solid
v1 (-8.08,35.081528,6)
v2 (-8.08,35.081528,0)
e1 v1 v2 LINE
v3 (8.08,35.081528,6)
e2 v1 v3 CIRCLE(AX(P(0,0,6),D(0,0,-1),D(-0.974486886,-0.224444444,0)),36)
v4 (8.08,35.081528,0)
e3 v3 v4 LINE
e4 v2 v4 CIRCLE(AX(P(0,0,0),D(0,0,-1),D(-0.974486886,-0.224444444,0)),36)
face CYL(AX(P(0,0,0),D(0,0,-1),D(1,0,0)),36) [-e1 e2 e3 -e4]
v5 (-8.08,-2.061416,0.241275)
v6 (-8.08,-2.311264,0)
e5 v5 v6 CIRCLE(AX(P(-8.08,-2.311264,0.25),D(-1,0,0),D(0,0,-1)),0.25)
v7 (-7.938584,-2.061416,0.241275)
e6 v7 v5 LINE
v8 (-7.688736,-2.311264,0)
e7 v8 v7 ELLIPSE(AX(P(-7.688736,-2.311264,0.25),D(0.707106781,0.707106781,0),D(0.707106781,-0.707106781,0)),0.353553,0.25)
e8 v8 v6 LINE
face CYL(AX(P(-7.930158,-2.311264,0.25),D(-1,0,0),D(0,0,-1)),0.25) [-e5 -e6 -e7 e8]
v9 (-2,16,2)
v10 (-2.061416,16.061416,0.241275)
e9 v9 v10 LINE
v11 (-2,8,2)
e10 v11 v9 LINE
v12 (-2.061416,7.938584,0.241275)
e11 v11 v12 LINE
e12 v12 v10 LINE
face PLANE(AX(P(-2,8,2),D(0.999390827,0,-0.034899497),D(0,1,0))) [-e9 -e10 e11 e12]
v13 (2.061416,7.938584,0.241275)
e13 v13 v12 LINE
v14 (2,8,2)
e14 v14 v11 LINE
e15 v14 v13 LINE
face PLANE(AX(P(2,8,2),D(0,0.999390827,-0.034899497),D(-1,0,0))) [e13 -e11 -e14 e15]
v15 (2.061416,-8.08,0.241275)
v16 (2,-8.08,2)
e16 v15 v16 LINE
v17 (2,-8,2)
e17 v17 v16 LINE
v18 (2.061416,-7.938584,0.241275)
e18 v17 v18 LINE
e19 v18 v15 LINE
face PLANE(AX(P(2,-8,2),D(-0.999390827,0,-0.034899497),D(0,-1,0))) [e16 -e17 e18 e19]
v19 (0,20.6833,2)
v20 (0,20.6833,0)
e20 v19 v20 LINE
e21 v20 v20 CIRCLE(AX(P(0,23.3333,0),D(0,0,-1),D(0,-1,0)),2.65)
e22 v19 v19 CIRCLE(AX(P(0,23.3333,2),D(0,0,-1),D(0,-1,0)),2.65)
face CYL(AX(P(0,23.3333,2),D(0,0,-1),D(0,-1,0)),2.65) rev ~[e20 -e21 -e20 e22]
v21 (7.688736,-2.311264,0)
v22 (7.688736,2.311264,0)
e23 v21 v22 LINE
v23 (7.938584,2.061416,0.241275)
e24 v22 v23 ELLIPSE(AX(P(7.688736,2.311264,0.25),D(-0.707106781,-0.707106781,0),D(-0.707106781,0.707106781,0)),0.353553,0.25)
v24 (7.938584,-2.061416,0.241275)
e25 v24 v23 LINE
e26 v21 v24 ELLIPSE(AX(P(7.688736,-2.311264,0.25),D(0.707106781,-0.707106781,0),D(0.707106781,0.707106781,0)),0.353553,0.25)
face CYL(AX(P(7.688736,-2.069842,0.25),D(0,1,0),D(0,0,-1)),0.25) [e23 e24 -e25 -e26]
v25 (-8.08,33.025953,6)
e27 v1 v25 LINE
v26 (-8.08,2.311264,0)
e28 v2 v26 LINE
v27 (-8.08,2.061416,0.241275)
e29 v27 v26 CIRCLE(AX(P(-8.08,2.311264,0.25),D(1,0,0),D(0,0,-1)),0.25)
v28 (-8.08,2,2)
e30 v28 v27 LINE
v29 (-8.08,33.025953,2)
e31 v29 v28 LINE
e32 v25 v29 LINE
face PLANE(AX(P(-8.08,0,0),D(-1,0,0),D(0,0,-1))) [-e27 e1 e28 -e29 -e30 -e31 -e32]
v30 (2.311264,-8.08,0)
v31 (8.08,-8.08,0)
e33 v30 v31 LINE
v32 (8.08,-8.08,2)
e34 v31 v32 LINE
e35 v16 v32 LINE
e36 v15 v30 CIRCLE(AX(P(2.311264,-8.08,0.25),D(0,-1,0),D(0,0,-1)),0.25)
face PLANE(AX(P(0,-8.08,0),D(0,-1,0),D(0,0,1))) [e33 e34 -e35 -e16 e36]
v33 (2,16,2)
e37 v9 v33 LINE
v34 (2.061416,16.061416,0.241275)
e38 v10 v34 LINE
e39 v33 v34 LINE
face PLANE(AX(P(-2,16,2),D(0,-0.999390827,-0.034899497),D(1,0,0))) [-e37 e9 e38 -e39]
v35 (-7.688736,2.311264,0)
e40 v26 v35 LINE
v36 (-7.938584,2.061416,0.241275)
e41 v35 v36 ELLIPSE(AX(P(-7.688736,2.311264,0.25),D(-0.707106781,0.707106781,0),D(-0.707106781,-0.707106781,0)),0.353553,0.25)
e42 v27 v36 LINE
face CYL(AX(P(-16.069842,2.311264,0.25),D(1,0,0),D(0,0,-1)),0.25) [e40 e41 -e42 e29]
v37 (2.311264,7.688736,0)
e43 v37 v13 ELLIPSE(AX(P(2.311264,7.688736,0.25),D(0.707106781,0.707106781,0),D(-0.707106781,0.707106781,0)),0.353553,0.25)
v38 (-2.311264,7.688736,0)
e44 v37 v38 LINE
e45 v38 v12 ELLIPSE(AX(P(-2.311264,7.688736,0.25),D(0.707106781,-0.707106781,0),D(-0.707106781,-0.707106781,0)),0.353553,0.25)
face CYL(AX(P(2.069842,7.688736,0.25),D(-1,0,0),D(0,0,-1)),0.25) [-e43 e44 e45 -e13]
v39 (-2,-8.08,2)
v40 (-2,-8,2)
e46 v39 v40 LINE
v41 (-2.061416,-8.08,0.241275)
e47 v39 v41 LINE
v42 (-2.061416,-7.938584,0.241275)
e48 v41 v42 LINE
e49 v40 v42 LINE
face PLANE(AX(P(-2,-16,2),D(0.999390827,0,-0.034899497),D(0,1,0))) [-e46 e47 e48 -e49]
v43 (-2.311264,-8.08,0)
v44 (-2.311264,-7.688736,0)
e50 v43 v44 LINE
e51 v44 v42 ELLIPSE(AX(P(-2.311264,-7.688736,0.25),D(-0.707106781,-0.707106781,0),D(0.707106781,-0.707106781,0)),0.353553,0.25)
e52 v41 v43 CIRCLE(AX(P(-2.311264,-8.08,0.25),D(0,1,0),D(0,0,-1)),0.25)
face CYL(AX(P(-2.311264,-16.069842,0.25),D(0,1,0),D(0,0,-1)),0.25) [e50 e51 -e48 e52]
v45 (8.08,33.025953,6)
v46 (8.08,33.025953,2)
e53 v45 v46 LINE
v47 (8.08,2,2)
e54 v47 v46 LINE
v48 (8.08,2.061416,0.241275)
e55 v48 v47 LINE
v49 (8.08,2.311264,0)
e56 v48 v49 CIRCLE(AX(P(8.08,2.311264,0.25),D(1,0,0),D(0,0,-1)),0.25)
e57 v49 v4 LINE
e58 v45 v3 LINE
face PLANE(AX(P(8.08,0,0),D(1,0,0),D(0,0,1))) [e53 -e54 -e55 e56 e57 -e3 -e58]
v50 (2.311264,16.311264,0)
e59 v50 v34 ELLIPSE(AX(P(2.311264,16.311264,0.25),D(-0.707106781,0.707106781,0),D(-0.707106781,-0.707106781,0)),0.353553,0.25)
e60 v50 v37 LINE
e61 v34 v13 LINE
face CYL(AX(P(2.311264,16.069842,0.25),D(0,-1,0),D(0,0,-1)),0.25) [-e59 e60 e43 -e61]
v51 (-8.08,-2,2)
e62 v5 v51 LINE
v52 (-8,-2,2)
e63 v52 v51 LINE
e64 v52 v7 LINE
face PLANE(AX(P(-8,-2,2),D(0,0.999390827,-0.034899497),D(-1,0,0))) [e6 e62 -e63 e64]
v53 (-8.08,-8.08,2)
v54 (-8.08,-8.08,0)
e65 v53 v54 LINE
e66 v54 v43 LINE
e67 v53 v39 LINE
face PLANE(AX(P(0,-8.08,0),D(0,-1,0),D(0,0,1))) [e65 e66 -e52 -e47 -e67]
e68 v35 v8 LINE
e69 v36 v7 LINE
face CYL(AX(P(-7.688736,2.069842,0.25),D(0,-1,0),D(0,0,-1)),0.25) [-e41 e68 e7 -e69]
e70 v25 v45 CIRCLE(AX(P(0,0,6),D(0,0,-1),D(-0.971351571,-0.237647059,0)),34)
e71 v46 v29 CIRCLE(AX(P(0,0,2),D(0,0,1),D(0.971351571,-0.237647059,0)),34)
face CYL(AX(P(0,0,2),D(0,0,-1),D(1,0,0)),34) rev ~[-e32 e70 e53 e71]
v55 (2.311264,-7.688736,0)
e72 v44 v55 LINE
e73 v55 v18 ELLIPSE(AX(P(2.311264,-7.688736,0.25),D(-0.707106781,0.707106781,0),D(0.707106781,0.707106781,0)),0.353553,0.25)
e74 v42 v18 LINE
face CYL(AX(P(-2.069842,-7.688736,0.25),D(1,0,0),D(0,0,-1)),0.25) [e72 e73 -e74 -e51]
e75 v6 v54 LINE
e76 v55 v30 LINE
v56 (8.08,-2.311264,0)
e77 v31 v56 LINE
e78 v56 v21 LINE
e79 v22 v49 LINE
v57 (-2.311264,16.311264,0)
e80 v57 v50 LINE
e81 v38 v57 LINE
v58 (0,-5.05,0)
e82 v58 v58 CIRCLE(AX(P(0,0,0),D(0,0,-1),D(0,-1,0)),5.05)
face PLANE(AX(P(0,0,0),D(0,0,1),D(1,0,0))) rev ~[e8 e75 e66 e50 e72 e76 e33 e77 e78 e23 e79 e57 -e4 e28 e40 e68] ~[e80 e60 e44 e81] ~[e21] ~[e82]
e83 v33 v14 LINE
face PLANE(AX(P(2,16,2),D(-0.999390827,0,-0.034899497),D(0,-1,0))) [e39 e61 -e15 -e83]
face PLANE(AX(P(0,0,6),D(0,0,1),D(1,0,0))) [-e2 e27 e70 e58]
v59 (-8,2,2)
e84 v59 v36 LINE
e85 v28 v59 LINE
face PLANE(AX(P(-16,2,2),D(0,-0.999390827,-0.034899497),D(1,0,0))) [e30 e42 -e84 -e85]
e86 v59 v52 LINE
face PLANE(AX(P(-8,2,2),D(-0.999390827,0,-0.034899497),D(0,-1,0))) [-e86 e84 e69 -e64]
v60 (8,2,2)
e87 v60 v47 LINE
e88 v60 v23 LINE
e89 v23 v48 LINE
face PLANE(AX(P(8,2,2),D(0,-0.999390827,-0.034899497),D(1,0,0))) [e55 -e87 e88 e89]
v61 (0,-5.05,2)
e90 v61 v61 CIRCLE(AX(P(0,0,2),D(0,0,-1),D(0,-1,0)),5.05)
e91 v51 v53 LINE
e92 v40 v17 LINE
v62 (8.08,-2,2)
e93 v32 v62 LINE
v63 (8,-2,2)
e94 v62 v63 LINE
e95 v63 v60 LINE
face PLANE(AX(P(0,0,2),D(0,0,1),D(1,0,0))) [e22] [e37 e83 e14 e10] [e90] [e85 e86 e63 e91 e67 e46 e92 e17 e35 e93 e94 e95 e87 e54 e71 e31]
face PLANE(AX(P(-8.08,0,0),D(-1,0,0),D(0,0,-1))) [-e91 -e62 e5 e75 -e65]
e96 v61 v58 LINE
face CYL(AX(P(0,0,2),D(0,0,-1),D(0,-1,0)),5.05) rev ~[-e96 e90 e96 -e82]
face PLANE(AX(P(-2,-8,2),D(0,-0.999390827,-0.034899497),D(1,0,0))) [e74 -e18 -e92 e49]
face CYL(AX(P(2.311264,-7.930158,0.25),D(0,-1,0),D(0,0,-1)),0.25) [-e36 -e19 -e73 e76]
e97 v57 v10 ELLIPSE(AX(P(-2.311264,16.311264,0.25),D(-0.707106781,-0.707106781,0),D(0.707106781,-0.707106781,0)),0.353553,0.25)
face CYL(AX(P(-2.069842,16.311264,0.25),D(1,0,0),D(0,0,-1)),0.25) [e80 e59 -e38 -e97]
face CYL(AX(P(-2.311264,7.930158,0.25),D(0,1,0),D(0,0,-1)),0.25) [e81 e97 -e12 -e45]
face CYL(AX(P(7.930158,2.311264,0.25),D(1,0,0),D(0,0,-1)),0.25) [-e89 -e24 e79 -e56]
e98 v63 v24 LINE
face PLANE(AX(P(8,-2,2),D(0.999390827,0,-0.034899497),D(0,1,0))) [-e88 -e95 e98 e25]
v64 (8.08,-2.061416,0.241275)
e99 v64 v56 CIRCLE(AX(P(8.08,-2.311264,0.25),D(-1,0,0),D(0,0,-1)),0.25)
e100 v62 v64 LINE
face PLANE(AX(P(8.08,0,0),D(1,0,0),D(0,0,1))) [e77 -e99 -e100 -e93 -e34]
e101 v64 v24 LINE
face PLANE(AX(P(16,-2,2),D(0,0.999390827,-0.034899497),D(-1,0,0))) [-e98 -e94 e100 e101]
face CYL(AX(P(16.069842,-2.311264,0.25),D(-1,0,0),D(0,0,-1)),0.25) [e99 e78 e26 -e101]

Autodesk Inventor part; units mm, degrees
sketch "Sketch1" plane through (0, 0, 0) normal (0, 0, 1) x (1, 0, 0)
  circle A0 centre (0, 0) radius 36
  dimension "d0" = 72
extrude "Extrusion1" add sketch "Sketch1" along normal blind 2
sketch "Sketch2" plane through (0, 0, 2) normal (0, 0, 1) x (1, 0, 0)
  circle A0 centre (0, 0) radius 36 projected
  circle A1 centre (0, 0) radius 34
  dimension "d3" = 2
extrude "Extrusion2" add sketch "Sketch2" along normal blind 4
sketch "Sketch4" plane through (0, 0, 2) normal (0, 0, 1) x (1, 0, 0)
  point P0 (0, 0)
  point P1 (0, 0)
hole "Hole1" at (0, 0, 2) direction (0, 0, -1) diameter 10.1 end through all
sketch "Sketch5" plane through (0, 0, 2) normal (0, 0, 1) x (1, 0, 0)
  point P0 (0, 0)
  point P1 (0, 23.3333)
  dimension "d13" = 23.3333
hole "Hole2" at (0, 23.3333, 2) direction (0, 0, -1) diameter 5.3 end through all
pattern_circular "Circular Pattern1" count 5 over 360 about axis through (0, 0, -100) along (0, 0, 1) of "Hole2"
sketch "Sketch8" plane through (0, 0, 2) normal (0, 0, 1) x (1, 0, 0)
  circle A0 centre (22.1913, 7.2104) radius 2.65 projected
  circle A1 centre (13.715, -18.8771) radius 2.65 projected
  circle A2 centre (-13.715, -18.8771) radius 2.65 projected
  circle A3 centre (-22.1913, 7.2104) radius 2.65 projected
  circle A4 centre (0, 23.3333) radius 2.65 projected
  circle A5 centre (0, 0) radius 5.05 projected
  circle A6 centre (0, 0) radius 34 projected
  line L0 (-2, 16) -> (2, 16)
  line L1 (2, 16) -> (2, 8)
  line L2 (2, 8) -> (-2, 8)
  line L3 (-2, 8) -> (-2, 16)
  dimension "d43" = 4
  dimension "d44" = 8
  dimension "d45" = 8
  dimension "d48" = 2
extrude "Extrusion5" cut sketch "Sketch8" against normal up to surface (2 mm away) draft 2 contours L0 L1 L2 L3
fillet "Fillet2" radius 0.25 4 edges at (0, 7.9302, 0) (2.0698, 12, 0) (0, 16.0698, 0) (-2.0698, 12, 0)
pattern_circular "Circular Pattern3" count 4 over 360 about axis through (0, 0, -100) along (0, 0, 1) of "Extrusion5", "Fillet2"
ref_plane "Work Plane1" through (8.08, 0, 0) normal (1, 0, 0) x (0, 1, 0)
ref_plane "Work Plane2" through (-8.08, 0, 0) normal (1, 0, 0) x (0, 1, 0)
ref_plane "Work Plane3" through (0, -8.08, 0) normal (0, 1, 0) x (-1, 0, 0)
split "Split1" plane through (0, -8.08, 0) removes the side toward (0, -1, 0)
split "Split2" plane through (8.08, 0, 0) removes the side toward (1, 0, 0)
split "Split3" plane through (-8.08, 0, 0) removes the side toward (-1, 0, 0)
equation "\"d0\" = W_innerDiameter + W_wallThickness"
equation "\"d1\" = W_wallThickness"
equation "\"d3\" = W_wallThickness"
equation "\"d4\" = W_innerDepth"
equation "\"d6\" = W_innerGearHoleDiameter"
equation "\"d13\" = OG_distanceFromCenter"
equation "\"d14\" = W_outerGearHoleDiameter"
equation "\"W_wallThickness\" = 2"
equation "\"W_innerDepth\" = 4"
equation "\"W_innerGearHoleDiameter\" = 10.1"
equation "\"W_outerGearHoleDiameter\" = 5.3"
equation "\"OG_distanceFromCenter\" = 23.33333"
equation "\"W_innerDiameter\" = 70"
equation "\"Wheel_Related_W_\" = 0"
equation "\"W_holesClearance\" = 0.3"
equation "\"TempSpotReserved7\" = 0"
equation "\"TempSpotReserved8\" = 0"
equation "\"TempSpotReserved9\" = 0"
equation "\"TempSpotReserved10\" = 0"
equation "\"TempSpotReserved11\" = 0"
equation "\"TempSpotReserved12\" = 0"
equation "\"TempSpotReserved13\" = 0"
equation "\"TempSpotReserved14\" = 0"
equation "\"TempSpotReserved15\" = 0"
equation "\"TempSpotReserved16\" = 0"
equation "\"TempSpotReserved17\" = 0"
equation "\"TempSpotReserved18\" = 0"
equation "\"TempSpotReserved19\" = 0"
equation "\"TempSpotReserved20\" = 0"
equation "\"Inner_Gear_Related_IG_\" = 0"
equation "\"IG_shaftDiameter\" = 7.5"
equation "\"IG_shaftLength\" = 15"
equation "\"IG_gearThickness\" = 2"
equation "\"TempSpotReserved25\" = 0"
equation "\"TempSpotReserved26\" = 0"
equation "\"TempSpotReserved27\" = 0"
equation "\"TempSpotReserved28\" = 0"
equation "\"TempSpotReserved29\" = 0"
equation "\"TempSpotReserved30\" = 0"
equation "\"TempSpotReserved31\" = 0"
equation "\"TempSpotReserved32\" = 0"
equation "\"TempSpotReserved33\" = 0"
equation "\"TempSpotReserved34\" = 0"
equation "\"TempSpotReserved35\" = 0"
equation "\"TempSpotReserved36\" = 0"
equation "\"TempSpotReserved37\" = 0"
equation "\"TempSpotReserved38\" = 0"
equation "\"TempSpotReserved39\" = 0"
equation "\"TempSpotReserved40\" = 0"
equation "\"Outer_Gear_Related_OG_\" = 0"
equation "\"OG_shaftDiameter\" = 5"
equation "\"OG_gearDiameter\" = 26.66667"
equation "\"OG_shaftLength\" = 7"
equation "\"OG_gearThickness\" = 2"
equation "\"TempSpotReserved47\" = 0"
equation "\"TempSpotReserved48\" = 0"
equation "\"TempSpotReserved49\" = 0"
equation "\"TempSpotReserved50\" = 0"
equation "\"TempSpotReserved51\" = 0"
equation "\"TempSpotReserved52\" = 0"
equation "\"TempSpotReserved53\" = 0"
equation "\"TempSpotReserved54\" = 0"
equation "\"TempSpotReserved55\" = 0"
equation "\"TempSpotReserved56\" = 0"
equation "\"TempSpotReserved57\" = 0"
equation "\"TempSpotReserved58\" = 0"
equation "\"TempSpotReserved59\" = 0"
equation "\"TempSpotReserved60\" = 0"
equation "\"Leg_Extensions_Related_LE_\" = 0"
equation "\"LE_baseDiameter\" = 5"
equation "\"LE_maxLength\" = 24.6522"
equation "\"LE_thickness\" = 2.5"
equation "\"IG_ratioToOuterGear\" = 0.75"
equation "\"B_bearingThickness\" = 1"
equation "\"TempSpotReserved43\" = 0"
equation "\"TempSpotReserved45\" = 0"
equation "\"Thisisatest\" = 25.4"
equation "\"TempSpotReserved46\" = 0"
equation "\"TempSpotReserved44\" = 0"
equation "\"LE_offsetAboveOuterGear\" = 0"
equation "\"Bearing_Related_B_\" = 0"
equation "\"TempSpotReserved42\" = 0"
equation "\"OG_skirtOffset\" = 1"
equation "\"OG_skirtThickness\" = 1"
equation "\"IG_skirtThickness\" = 2"
equation "\"IG_extentionLength\" = 18.33333"
equation "\"IG_extentionThickness\" = 3"
equation "\"IG_slitWidth\" = 4"
equation "\"IG_slitlength\" = 8"
equation "\"IG_slitClearance\" = 0.2"
equation "\"IG_slitDistanceFromCenterHole\" = 8"
equation "\"Reserved_10\" = 0"
equation "\"Reserved_9\" = 0"
equation "\"Reserved_11\" = 0"
equation "\"Reserved_12\" = 0"
equation "\"Reserved_8\" = 0"
equation "\"Reserved_7\" = 0"
equation "\"Reserved_26\" = 0"
equation "\"Reserved_20\" = 0"
equation "\"Reserved_22\" = 0"
equation "\"Reserved_23\" = 0"
equation "\"Reserved_25\" = 0"
equation "\"Reserved_24\" = 0"
equation "\"Reserved_21\" = 0"
equation "\"Reserved_19\" = 0"
equation "\"Reserved_27\" = 0"
equation "\"Reserved_14\" = 0"
equation "\"Reserved_15\" = 0"
equation "\"Reserved_16\" = 0"
equation "\"Reserved_13\" = 0"
equation "\"Reserved_17\" = 0"
equation "\"Reserved_18\" = 0"
equation "\"Bearing_Related_BR_\" = 0"
equation "\"BR_bearingThickness\" = 1"
equation "\"Block_Related_BL_\" = 0"
equation "\"BL_width\" = 3.8"
equation "\"BL_length\" = 7.8"
equation "\"W_filletRadius\" = 0.25"
equation "\"W_extrutsionTaperAngle\" = 2deg"
equation "\"OG_protrudeDistance\" = 3"
properties part number "wheel1"
